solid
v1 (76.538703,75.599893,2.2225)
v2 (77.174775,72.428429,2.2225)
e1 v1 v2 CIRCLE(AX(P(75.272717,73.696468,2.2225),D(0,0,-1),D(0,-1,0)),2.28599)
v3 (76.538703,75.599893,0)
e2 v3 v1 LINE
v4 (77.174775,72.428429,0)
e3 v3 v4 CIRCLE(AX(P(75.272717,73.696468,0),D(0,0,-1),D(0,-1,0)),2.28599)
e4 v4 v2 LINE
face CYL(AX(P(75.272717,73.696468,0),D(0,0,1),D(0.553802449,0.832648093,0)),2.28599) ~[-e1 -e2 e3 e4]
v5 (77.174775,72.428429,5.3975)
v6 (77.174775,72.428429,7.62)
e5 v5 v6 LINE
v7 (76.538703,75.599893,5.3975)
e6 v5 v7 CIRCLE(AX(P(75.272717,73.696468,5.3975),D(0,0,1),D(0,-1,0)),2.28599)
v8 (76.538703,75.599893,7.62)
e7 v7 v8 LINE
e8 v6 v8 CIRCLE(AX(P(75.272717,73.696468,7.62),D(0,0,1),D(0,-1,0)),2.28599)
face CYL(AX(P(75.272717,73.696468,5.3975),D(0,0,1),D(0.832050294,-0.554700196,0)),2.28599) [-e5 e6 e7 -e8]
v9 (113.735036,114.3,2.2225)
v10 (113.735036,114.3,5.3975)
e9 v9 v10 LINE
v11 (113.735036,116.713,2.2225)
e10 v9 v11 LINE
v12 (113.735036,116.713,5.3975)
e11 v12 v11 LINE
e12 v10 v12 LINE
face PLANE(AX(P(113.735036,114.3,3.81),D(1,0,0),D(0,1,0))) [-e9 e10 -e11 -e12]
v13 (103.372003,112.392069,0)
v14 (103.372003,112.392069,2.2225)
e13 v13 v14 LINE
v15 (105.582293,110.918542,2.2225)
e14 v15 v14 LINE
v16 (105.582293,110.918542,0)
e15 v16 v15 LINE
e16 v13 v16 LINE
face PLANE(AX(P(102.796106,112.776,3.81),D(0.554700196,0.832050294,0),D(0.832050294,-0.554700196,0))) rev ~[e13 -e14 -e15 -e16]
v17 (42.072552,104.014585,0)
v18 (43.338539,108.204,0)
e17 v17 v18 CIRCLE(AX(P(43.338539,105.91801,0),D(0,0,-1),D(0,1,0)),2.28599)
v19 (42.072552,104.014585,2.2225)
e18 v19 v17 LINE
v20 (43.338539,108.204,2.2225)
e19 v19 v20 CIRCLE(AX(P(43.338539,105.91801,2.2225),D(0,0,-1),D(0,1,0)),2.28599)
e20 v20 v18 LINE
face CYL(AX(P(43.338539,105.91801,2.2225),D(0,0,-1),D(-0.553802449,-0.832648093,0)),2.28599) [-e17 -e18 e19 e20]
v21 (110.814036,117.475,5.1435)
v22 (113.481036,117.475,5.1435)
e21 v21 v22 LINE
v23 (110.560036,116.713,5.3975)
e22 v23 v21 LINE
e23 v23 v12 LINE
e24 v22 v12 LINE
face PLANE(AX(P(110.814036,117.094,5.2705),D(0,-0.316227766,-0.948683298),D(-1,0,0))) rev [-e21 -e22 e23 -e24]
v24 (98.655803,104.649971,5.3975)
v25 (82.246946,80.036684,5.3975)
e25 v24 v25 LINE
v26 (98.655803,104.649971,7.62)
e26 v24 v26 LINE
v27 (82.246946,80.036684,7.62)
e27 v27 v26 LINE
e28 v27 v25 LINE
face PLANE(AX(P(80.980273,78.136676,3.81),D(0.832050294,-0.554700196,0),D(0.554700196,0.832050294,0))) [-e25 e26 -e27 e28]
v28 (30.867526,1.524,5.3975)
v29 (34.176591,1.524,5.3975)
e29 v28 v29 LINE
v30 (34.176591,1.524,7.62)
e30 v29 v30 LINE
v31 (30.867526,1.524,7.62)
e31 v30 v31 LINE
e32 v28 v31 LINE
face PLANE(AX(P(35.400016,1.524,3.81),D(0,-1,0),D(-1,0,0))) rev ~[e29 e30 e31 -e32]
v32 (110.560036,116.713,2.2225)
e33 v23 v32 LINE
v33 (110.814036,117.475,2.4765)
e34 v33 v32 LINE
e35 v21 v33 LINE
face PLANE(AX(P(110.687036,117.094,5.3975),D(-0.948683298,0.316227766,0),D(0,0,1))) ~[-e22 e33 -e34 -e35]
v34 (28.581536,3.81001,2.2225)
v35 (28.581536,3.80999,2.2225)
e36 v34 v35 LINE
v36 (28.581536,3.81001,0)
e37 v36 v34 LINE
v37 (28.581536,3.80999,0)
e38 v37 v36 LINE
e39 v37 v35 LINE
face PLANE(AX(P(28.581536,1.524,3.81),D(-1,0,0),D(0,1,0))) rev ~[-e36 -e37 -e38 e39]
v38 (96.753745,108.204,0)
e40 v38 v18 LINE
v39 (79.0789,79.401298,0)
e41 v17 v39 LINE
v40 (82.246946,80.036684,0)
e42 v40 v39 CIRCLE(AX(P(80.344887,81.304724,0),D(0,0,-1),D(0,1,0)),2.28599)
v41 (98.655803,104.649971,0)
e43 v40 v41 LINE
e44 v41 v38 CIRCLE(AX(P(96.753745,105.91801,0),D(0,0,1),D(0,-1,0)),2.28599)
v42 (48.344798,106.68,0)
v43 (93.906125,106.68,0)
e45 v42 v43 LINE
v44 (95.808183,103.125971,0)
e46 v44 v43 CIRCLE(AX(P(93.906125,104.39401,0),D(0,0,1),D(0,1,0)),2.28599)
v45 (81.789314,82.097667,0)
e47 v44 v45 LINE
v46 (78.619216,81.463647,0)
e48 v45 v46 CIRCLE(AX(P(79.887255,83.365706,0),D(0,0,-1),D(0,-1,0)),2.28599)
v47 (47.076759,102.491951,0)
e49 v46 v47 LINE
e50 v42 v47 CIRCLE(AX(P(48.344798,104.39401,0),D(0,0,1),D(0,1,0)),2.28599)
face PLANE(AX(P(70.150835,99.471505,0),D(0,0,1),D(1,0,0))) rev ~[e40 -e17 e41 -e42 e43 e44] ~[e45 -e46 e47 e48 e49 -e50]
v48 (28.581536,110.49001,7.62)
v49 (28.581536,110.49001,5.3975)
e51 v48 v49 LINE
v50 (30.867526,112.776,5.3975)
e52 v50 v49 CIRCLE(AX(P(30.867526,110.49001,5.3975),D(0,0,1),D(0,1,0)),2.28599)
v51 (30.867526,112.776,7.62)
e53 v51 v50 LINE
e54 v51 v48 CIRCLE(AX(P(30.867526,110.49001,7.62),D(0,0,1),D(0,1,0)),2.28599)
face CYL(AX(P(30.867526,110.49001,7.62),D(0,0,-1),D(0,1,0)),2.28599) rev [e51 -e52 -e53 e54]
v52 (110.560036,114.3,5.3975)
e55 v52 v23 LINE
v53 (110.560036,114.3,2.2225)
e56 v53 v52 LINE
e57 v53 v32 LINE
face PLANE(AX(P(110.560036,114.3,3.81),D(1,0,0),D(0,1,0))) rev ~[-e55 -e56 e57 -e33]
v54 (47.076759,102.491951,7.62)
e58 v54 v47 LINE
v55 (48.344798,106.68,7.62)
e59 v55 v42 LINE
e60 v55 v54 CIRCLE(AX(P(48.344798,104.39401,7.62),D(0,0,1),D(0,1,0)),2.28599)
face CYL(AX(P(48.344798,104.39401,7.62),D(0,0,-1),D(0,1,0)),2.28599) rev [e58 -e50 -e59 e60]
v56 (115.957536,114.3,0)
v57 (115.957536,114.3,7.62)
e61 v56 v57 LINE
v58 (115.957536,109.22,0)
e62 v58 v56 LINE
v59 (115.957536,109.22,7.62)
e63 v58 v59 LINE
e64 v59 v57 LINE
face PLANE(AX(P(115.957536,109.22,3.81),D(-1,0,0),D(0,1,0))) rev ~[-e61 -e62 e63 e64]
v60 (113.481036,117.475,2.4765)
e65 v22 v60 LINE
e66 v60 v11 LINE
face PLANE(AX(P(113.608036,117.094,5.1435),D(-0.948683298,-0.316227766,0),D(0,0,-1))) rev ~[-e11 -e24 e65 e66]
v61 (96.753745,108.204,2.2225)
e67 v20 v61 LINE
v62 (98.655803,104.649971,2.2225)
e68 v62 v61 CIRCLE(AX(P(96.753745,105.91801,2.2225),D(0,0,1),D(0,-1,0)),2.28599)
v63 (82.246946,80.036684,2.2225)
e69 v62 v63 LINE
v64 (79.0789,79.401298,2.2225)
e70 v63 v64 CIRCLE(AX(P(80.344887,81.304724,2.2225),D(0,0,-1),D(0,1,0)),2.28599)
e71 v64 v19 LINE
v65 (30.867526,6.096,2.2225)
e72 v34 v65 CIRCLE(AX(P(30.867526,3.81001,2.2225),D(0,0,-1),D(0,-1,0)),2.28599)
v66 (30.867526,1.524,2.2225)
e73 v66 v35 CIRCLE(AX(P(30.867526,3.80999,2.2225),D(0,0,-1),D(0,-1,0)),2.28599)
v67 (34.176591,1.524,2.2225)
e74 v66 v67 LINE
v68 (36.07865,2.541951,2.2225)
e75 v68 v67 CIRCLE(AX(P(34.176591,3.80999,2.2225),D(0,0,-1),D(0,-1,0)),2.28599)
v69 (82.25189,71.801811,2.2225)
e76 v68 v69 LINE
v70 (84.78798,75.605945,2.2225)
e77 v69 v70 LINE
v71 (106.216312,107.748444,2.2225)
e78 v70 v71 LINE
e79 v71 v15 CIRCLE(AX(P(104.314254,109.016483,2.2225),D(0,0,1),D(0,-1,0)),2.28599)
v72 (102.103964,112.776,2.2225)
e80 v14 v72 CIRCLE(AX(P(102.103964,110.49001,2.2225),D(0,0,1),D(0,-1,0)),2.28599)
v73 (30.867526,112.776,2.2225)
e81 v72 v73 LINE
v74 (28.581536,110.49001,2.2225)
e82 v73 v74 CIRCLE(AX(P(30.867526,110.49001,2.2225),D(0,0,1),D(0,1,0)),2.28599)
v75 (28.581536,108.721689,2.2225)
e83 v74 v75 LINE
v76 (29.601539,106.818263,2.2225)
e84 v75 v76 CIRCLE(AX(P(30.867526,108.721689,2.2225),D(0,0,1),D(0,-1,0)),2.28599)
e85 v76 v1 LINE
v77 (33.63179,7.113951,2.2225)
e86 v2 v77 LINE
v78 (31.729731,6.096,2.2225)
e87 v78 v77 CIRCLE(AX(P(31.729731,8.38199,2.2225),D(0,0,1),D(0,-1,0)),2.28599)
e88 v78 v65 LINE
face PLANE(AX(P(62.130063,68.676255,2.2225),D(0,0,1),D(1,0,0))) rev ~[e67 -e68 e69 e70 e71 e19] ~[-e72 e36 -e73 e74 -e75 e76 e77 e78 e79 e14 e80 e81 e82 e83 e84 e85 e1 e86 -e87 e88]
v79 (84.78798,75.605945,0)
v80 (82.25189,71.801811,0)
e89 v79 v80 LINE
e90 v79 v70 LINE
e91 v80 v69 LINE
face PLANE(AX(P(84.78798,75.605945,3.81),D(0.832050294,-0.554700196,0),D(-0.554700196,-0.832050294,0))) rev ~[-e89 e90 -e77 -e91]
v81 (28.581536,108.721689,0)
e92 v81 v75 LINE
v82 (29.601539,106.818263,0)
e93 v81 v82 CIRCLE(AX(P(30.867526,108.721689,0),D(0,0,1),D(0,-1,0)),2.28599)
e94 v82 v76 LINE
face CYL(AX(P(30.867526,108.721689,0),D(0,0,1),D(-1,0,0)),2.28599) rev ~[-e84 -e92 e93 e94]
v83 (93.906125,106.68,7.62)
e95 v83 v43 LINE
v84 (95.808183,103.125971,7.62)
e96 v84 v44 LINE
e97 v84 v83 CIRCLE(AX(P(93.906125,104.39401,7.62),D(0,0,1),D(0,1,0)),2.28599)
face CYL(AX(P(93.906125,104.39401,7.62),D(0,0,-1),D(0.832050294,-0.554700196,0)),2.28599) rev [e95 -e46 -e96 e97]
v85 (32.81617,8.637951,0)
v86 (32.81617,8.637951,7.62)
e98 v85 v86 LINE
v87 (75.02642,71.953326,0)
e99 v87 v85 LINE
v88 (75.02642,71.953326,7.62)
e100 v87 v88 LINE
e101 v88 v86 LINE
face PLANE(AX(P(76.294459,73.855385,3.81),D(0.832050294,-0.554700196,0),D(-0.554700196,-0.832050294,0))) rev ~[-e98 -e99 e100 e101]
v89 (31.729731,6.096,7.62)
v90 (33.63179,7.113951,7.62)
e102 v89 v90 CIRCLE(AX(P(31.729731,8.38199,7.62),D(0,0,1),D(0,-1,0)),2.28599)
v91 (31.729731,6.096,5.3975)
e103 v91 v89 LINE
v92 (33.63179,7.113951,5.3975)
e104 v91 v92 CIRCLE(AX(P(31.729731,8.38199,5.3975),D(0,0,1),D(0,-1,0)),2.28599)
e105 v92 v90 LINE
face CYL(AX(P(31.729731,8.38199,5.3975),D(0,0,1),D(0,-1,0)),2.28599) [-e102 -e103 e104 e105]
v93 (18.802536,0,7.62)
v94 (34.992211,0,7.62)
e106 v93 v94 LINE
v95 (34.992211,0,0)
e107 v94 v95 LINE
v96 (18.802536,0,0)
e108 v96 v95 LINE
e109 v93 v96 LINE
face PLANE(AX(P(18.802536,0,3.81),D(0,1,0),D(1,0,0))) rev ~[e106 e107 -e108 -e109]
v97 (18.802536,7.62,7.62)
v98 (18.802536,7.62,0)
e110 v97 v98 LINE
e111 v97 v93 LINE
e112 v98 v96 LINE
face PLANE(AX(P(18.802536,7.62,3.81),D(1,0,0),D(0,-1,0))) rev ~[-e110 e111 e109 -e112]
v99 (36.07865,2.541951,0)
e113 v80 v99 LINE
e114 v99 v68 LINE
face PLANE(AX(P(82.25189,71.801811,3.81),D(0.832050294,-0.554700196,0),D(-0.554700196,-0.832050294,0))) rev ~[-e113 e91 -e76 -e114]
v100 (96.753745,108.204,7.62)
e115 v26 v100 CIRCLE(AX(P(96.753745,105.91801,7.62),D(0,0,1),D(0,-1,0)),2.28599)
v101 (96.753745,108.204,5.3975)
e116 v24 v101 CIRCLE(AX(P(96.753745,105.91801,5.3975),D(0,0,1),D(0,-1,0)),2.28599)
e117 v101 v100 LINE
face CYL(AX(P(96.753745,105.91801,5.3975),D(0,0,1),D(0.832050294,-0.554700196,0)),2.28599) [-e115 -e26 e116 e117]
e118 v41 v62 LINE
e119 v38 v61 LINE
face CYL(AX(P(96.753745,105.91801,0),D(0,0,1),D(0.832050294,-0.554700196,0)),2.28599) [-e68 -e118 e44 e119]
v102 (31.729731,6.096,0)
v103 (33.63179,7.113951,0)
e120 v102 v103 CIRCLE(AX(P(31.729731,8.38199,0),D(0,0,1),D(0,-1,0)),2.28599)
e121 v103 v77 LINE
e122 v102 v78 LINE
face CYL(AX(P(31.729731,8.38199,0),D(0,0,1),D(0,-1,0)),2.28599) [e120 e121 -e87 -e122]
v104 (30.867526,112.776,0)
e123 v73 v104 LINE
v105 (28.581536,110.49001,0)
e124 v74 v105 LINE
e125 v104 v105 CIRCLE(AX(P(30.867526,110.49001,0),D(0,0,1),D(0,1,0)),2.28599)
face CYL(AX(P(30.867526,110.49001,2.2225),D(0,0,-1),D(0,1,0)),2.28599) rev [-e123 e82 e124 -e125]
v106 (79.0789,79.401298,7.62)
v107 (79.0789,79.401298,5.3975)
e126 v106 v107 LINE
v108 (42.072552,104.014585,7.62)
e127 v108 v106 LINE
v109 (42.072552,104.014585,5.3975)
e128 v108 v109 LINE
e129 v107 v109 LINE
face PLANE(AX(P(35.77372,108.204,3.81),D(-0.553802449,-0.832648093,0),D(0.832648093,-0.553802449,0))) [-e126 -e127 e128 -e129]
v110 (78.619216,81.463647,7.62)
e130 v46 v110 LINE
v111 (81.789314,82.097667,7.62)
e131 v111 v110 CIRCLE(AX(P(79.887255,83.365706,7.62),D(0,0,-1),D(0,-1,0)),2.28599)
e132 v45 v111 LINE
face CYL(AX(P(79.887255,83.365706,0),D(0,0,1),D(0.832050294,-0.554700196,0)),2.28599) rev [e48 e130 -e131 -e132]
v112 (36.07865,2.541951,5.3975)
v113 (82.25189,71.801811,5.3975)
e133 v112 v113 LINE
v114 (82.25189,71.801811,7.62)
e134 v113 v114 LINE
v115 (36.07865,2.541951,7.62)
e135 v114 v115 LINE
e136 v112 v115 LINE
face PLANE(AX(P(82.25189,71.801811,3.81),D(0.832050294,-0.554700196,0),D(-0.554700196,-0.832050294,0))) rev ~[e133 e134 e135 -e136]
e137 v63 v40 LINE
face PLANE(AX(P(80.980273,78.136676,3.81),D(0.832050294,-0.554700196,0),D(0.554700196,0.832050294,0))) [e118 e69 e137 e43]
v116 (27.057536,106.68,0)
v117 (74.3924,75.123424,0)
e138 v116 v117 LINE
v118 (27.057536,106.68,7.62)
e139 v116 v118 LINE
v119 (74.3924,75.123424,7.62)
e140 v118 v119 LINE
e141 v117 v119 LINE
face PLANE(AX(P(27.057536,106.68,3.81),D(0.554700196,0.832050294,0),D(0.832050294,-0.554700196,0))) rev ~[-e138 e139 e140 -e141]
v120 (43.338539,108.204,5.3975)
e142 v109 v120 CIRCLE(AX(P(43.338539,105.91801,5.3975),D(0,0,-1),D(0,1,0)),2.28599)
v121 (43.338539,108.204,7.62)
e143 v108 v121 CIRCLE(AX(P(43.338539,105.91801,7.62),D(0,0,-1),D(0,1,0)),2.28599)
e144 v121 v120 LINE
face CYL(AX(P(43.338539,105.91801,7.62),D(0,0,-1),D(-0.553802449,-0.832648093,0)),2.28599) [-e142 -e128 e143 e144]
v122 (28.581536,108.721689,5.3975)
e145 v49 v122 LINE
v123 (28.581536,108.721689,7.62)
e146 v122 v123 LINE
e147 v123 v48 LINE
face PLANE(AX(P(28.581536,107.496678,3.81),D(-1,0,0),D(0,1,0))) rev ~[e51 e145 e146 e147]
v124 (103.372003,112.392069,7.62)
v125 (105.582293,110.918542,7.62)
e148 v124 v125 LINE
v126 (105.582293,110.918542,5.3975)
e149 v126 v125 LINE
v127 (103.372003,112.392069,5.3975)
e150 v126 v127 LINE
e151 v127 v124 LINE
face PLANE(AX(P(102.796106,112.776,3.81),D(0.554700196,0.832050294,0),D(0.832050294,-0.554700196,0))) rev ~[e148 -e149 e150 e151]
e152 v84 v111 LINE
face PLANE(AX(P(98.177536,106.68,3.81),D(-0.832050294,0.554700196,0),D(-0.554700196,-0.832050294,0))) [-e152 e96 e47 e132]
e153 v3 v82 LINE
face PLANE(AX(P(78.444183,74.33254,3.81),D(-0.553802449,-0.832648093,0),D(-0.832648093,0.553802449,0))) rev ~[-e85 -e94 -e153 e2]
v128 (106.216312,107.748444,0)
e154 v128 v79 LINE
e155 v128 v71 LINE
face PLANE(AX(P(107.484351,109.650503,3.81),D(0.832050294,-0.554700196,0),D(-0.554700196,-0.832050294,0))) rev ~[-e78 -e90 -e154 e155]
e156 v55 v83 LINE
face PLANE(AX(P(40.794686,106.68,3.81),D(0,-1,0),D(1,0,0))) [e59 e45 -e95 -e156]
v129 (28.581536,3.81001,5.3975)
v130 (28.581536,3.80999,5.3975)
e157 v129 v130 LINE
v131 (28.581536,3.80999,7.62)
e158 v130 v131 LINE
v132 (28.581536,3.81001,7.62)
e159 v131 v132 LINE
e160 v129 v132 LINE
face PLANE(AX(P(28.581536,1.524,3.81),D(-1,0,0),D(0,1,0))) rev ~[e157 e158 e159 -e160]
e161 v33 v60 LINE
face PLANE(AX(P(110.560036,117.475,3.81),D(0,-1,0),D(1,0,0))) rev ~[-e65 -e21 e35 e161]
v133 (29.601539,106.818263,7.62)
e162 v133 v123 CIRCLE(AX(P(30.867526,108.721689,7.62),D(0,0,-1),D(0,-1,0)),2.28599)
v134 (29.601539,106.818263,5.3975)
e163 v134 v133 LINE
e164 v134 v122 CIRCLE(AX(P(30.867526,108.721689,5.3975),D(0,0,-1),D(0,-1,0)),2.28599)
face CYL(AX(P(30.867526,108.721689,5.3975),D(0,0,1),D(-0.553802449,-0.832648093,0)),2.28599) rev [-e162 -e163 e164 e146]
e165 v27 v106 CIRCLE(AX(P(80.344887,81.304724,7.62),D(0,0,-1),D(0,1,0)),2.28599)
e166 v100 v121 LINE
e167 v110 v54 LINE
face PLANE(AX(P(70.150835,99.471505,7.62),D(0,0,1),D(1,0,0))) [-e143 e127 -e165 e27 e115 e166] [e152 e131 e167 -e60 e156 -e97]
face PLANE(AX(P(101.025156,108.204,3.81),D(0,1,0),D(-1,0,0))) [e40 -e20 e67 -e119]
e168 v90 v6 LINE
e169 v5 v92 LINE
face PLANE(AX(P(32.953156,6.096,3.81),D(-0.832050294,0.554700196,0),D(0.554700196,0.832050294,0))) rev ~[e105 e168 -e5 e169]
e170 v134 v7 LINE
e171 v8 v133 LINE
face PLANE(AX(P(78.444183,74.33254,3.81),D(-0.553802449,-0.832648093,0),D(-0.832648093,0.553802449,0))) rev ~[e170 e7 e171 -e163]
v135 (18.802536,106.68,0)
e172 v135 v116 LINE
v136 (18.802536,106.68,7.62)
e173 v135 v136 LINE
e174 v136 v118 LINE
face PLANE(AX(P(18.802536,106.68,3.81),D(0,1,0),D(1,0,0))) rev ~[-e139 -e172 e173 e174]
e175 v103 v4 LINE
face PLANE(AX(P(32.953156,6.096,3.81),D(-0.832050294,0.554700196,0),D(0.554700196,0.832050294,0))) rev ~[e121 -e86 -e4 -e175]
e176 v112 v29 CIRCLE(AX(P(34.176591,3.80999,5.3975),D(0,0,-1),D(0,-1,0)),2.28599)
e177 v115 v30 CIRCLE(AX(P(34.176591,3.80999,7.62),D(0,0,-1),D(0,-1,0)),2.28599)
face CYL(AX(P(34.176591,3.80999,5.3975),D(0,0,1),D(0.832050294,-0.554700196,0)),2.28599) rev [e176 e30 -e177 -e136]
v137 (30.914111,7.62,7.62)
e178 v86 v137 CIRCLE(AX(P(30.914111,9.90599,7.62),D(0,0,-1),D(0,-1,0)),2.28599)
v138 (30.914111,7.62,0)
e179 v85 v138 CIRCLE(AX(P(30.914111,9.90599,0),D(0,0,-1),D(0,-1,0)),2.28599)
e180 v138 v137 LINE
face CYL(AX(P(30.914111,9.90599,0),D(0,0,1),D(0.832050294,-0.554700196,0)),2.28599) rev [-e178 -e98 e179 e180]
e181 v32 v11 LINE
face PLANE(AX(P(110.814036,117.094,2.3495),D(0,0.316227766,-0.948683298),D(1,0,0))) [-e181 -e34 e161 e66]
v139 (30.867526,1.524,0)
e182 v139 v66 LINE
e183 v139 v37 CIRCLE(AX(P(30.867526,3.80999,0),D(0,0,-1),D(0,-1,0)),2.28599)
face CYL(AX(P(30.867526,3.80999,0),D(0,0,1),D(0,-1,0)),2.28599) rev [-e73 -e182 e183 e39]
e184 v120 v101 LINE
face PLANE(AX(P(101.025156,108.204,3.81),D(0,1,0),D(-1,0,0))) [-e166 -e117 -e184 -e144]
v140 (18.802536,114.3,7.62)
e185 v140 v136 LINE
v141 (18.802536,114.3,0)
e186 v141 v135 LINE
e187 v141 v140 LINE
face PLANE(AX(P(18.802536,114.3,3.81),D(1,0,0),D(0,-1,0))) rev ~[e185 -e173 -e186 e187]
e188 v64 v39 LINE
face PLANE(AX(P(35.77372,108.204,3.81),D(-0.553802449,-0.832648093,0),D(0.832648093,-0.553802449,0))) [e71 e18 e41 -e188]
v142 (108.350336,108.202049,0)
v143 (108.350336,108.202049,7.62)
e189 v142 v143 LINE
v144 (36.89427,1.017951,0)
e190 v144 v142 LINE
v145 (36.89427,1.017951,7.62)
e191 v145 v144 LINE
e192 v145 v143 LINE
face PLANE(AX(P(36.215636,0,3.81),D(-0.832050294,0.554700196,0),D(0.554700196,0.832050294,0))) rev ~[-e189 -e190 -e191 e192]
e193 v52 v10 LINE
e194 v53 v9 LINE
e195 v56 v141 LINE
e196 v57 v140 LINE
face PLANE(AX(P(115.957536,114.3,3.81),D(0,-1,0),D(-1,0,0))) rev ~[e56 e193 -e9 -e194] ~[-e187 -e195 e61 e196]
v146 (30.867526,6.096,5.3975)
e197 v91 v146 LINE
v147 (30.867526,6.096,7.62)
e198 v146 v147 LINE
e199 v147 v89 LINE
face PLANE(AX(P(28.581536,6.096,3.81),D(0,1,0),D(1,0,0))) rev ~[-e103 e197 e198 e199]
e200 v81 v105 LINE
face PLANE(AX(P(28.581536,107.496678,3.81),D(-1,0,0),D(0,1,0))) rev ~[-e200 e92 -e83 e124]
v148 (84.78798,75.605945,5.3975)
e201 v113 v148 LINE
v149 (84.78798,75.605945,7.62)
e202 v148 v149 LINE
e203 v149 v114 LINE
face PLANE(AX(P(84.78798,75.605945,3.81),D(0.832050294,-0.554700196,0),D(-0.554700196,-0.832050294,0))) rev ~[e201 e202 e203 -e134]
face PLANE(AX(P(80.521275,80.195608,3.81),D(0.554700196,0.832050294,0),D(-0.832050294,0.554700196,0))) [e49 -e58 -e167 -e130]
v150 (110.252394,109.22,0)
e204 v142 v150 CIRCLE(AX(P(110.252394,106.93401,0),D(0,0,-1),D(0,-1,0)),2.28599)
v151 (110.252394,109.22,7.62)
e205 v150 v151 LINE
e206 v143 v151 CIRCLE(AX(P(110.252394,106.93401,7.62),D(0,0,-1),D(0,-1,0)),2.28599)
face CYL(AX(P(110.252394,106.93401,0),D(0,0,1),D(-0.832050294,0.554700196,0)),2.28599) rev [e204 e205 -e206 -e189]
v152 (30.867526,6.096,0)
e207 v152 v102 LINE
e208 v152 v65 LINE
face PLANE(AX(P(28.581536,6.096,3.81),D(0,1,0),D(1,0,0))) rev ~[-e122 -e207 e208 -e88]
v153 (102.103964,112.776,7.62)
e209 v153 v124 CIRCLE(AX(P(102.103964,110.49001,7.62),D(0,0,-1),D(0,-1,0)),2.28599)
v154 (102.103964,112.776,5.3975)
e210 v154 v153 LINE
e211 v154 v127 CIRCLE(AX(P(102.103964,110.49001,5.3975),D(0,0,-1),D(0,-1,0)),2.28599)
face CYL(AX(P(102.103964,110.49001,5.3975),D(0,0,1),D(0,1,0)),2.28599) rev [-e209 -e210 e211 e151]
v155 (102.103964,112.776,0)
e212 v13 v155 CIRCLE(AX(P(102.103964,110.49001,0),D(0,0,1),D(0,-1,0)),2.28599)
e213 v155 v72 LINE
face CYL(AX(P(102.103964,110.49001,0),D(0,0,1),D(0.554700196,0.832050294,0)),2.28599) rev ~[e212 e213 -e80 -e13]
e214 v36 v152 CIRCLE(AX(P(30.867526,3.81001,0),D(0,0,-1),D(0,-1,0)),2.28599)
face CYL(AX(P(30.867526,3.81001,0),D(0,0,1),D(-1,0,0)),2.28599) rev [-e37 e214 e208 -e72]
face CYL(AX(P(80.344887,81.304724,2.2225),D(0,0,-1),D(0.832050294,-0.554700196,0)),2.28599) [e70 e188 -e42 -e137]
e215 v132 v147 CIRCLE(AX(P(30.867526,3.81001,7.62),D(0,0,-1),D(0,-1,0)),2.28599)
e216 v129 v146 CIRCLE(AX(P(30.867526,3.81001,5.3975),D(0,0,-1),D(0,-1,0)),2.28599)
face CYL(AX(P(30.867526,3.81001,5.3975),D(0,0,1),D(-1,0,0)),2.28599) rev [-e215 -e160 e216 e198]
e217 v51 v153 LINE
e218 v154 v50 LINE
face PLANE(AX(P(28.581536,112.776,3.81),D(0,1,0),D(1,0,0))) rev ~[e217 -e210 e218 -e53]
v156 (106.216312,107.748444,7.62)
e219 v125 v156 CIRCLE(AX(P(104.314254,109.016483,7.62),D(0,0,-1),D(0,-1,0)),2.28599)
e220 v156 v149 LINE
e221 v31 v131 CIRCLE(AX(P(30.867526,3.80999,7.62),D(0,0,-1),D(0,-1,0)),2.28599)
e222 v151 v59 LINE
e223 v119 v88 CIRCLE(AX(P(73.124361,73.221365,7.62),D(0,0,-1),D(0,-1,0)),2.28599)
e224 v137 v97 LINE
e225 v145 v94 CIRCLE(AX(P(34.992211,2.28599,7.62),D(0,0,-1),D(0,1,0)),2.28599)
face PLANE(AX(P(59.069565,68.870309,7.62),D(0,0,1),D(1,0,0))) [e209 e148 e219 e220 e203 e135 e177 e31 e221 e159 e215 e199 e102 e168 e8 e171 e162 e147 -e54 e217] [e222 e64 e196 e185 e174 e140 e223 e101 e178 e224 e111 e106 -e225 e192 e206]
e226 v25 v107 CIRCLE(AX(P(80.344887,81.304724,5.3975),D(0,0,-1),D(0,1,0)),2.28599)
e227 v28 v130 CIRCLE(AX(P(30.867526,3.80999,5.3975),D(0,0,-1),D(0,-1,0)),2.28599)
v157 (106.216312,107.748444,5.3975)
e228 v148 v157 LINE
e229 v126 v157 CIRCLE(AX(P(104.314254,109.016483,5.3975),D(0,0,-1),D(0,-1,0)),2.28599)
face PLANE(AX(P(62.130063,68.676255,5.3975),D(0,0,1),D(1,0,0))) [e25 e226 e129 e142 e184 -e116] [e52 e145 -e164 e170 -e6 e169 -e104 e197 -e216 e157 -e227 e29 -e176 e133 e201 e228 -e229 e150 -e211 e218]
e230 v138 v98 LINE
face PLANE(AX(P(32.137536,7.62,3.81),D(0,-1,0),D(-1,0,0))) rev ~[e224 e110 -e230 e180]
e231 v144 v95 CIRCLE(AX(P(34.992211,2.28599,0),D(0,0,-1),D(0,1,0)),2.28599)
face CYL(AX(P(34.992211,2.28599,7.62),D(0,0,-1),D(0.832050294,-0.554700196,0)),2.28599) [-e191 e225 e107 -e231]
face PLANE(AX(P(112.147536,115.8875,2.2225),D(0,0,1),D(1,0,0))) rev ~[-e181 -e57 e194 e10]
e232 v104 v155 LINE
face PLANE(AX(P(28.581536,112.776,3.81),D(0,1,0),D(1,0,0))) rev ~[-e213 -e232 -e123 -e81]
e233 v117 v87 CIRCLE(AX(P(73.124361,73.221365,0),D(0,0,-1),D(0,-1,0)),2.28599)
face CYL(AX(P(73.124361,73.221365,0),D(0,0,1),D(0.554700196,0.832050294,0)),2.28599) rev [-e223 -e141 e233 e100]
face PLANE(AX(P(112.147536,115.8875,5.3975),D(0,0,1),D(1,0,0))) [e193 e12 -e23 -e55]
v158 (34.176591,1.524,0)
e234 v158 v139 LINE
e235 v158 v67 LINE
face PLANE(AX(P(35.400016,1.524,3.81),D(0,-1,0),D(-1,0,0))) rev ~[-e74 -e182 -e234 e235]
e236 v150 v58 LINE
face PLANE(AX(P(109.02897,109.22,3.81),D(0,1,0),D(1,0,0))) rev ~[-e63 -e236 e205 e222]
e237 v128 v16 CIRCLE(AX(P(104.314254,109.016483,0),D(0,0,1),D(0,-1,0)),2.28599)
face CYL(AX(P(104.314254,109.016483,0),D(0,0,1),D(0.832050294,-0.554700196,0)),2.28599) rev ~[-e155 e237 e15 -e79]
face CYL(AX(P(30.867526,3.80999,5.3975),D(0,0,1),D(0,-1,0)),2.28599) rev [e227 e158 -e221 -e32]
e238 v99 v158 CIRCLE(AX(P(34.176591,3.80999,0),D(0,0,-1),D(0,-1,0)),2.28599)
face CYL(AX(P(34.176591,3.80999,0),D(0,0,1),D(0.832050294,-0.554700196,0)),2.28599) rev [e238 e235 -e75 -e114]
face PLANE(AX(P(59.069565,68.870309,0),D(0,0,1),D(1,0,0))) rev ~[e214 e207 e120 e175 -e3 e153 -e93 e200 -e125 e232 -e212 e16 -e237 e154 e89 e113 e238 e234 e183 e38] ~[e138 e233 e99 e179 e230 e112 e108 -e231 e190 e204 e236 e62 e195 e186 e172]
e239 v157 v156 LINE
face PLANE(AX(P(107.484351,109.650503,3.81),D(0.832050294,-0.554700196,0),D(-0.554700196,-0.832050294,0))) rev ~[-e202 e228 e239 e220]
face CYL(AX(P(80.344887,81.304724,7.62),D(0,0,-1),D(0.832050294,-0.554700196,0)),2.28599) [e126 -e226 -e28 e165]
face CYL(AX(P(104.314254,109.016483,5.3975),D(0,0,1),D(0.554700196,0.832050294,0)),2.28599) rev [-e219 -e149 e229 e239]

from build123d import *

# Parameters (mm, degrees)
F1_DEPTH    = 1.5875
F0_W        = 3.175
F0_H        = 3.81
F2_DEPTH    = 3.81
F0_H_2      = 3.175
F3_DEPTH    = 1.5875
F5_R        = 2.28599
F6_C1_SIZE2 = 0.254
F6_C1_SIZE  = 0.762
F6_C2_SIZE2 = 0.254
F6_C2_SIZE  = 0.762
F6_C3_SIZE2 = 0.762
F6_C3_SIZE  = 0.254
F6_C4_SIZE2 = 0.762
F6_C4_SIZE  = 0.254


# Not quite as in the source:
# - a fillet or chamfer is up to 0.001 mm smaller than in the source, because OpenCascade refuses the exact size


with BuildPart() as f1:
    # F0 (on Top) → F1 (new body, symmetric)
    with BuildSketch(Plane.XY):
        Polygon((84.7879795397, 75.6059451024), (107.4843514416, 109.6505029552), (102.7961058745, 112.776), (28.5815359464, 112.776), (28.5815359464, 107.4966776252), (78.4441827097, 74.332540073), (32.9531559943, 6.096), (28.5815359464, 6.096), (28.5815359464, 1.524), (35.4000161381, 1.524), (82.2518902426, 71.8018111567), align=None)
        Polygon((35.7737204145, 108.204), (101.0251559943, 108.204), (80.9802734819, 78.1366762315), align=None, mode=Mode.SUBTRACT)
    extrude(amount=F1_DEPTH, both=True)

    # F0 (on Top) → F2 (join, symmetric)
    with BuildSketch(Plane.XY):
        Polygon((27.0575359464, 3.81), (27.0575359464, 0), (36.215636186, 0), (109.0289695194, 109.22), (115.9575359464, 109.22), (115.9575359464, 114.3), (113.7350359464, 114.3), (110.5600359464, 114.3), (103.2575359464, 114.3), (27.0575359464, 114.3), (18.8025359464, 114.3), (18.8025359464, 106.68), (23.8825359464, 106.68), (23.8825359464, 110.49), (27.0575359464, 110.49), (27.0575359464, 106.68), (76.2944590233, 73.8553846154), (32.1375359464, 7.62), (27.0575359464, 7.62), (18.8025359464, 7.62), (18.8025359464, 0), (23.8825359464, 0), (23.8825359464, 3.81), align=None)
        Polygon((102.7961058745, 112.776), (107.4843514416, 109.6505029552), (84.7879795397, 75.6059451024), (82.2518902426, 71.8018111567), (35.4000161381, 1.524), (28.5815359464, 1.524), (28.5815359464, 6.096), (32.9531559943, 6.096), (78.4441827097, 74.332540073), (28.5815359464, 107.4966776252), (28.5815359464, 112.776), align=None, mode=Mode.SUBTRACT)
        Polygon((80.9802734819, 78.1366762315), (101.0251559943, 108.204), (35.7737204145, 108.204), align=None)
        Polygon((80.5212745185, 80.1956078582), (40.7946863059, 106.68), (98.1775359464, 106.68), align=None, mode=Mode.SUBTRACT)
        with Locations((25.4700359464, 1.905)):
            Rectangle(F0_W, F0_H)
        with Locations((25.4700359464, 108.585)):
            Rectangle(F0_W, F0_H)
    extrude(amount=F2_DEPTH, both=True)

    # F0 (on Top) → F3 (join, symmetric)
    with BuildSketch(Plane.XY):
        with Locations((112.1475359464, 115.8875)):
            Rectangle(F0_W, F0_H_2)
    extrude(amount=F3_DEPTH, both=True)


with BuildPart() as f1_1:
    # F4: moved
    add(f1.part.moved(Location((0, 0, 3.81))))

    # F5 (radius 2.286 in the source; OpenCascade refuses exactly that, so slightly less here)
    f5_edges = [f1_1.edges().sort_by_distance(p)[0] for p in [
        (35.77372, 108.204, 6.50875),
        (35.77372, 108.204, 1.11125),
        (101.025156, 108.204, 6.50875),
        (101.025156, 108.204, 1.11125),
        (80.980273, 78.136676, 1.11125),
        (80.980273, 78.136676, 6.50875),
        (78.444183, 74.33254, 6.50875),
        (78.444183, 74.33254, 1.11125),
        (102.796106, 112.776, 6.50875),
        (102.796106, 112.776, 1.11125),
        (28.581536, 112.776, 6.50875),
        (28.581536, 107.496678, 6.50875),
        (28.581536, 107.496678, 1.11125),
        (28.581536, 112.776, 1.11125),
        (32.953156, 6.096, 6.50875),
        (32.953156, 6.096, 1.11125),
        (35.400016, 1.524, 1.11125),
        (35.400016, 1.524, 6.50875),
        (28.581536, 6.096, 6.50875),
        (28.581536, 1.524, 6.50875),
        (28.581536, 1.524, 1.11125),
        (28.581536, 6.096, 1.11125),
        (107.484351, 109.650503, 6.50875),
        (107.484351, 109.650503, 1.11125),
        (109.02897, 109.22, 3.81),
        (36.215636, 0, 3.81),
        (76.294459, 73.855385, 3.81),
        (32.137536, 7.62, 3.81),
        (40.794686, 106.68, 3.81),
        (80.521275, 80.195608, 3.81),
        (98.177536, 106.68, 3.81),
    ]]
    fillet(f5_edges, radius=F5_R)

    # F6: chamfer of 0.254 x 0.762 on 4 edges, made by hand

    # F6_c1
    f6_c1_edges = [f1_1.edges().sort_by_distance(p)[0] for p in [
        (110.5600359464, 117.475, 3.81),
    ]]
    f6_c1_side = f1_1.faces().sort_by_distance((110.5600359464, 117.46992, 3.81))[0]
    chamfer(f6_c1_edges, length=F6_C1_SIZE, length2=F6_C1_SIZE2, reference=f6_c1_side)

    # F6_c2
    f6_c2_edges = [f1_1.edges().sort_by_distance(p)[0] for p in [
        (112.2745359464, 117.475, 5.3975),
    ]]
    f6_c2_side = f1_1.faces().sort_by_distance((112.2745359464, 117.46992, 5.3975))[0]
    chamfer(f6_c2_edges, length=F6_C2_SIZE, length2=F6_C2_SIZE2, reference=f6_c2_side)

    # F6_c3
    f6_c3_edges = [f1_1.edges().sort_by_distance(p)[0] for p in [
        (113.7350359464, 117.475, 3.683),
    ]]
    f6_c3_side = f1_1.faces().sort_by_distance((113.7299559464, 117.475, 3.683))[0]
    chamfer(f6_c3_edges, length=F6_C3_SIZE, length2=F6_C3_SIZE2, reference=f6_c3_side)

    # F6_c4
    f6_c4_edges = [f1_1.edges().sort_by_distance(p)[0] for p in [
        (112.1475359464, 117.475, 2.2225),
    ]]
    f6_c4_side = f1_1.faces().sort_by_distance((112.1475359464, 117.475, 2.22758))[0]
    chamfer(f6_c4_edges, length=F6_C4_SIZE, length2=F6_C4_SIZE2, reference=f6_c4_side)


solid = f1_1.part
